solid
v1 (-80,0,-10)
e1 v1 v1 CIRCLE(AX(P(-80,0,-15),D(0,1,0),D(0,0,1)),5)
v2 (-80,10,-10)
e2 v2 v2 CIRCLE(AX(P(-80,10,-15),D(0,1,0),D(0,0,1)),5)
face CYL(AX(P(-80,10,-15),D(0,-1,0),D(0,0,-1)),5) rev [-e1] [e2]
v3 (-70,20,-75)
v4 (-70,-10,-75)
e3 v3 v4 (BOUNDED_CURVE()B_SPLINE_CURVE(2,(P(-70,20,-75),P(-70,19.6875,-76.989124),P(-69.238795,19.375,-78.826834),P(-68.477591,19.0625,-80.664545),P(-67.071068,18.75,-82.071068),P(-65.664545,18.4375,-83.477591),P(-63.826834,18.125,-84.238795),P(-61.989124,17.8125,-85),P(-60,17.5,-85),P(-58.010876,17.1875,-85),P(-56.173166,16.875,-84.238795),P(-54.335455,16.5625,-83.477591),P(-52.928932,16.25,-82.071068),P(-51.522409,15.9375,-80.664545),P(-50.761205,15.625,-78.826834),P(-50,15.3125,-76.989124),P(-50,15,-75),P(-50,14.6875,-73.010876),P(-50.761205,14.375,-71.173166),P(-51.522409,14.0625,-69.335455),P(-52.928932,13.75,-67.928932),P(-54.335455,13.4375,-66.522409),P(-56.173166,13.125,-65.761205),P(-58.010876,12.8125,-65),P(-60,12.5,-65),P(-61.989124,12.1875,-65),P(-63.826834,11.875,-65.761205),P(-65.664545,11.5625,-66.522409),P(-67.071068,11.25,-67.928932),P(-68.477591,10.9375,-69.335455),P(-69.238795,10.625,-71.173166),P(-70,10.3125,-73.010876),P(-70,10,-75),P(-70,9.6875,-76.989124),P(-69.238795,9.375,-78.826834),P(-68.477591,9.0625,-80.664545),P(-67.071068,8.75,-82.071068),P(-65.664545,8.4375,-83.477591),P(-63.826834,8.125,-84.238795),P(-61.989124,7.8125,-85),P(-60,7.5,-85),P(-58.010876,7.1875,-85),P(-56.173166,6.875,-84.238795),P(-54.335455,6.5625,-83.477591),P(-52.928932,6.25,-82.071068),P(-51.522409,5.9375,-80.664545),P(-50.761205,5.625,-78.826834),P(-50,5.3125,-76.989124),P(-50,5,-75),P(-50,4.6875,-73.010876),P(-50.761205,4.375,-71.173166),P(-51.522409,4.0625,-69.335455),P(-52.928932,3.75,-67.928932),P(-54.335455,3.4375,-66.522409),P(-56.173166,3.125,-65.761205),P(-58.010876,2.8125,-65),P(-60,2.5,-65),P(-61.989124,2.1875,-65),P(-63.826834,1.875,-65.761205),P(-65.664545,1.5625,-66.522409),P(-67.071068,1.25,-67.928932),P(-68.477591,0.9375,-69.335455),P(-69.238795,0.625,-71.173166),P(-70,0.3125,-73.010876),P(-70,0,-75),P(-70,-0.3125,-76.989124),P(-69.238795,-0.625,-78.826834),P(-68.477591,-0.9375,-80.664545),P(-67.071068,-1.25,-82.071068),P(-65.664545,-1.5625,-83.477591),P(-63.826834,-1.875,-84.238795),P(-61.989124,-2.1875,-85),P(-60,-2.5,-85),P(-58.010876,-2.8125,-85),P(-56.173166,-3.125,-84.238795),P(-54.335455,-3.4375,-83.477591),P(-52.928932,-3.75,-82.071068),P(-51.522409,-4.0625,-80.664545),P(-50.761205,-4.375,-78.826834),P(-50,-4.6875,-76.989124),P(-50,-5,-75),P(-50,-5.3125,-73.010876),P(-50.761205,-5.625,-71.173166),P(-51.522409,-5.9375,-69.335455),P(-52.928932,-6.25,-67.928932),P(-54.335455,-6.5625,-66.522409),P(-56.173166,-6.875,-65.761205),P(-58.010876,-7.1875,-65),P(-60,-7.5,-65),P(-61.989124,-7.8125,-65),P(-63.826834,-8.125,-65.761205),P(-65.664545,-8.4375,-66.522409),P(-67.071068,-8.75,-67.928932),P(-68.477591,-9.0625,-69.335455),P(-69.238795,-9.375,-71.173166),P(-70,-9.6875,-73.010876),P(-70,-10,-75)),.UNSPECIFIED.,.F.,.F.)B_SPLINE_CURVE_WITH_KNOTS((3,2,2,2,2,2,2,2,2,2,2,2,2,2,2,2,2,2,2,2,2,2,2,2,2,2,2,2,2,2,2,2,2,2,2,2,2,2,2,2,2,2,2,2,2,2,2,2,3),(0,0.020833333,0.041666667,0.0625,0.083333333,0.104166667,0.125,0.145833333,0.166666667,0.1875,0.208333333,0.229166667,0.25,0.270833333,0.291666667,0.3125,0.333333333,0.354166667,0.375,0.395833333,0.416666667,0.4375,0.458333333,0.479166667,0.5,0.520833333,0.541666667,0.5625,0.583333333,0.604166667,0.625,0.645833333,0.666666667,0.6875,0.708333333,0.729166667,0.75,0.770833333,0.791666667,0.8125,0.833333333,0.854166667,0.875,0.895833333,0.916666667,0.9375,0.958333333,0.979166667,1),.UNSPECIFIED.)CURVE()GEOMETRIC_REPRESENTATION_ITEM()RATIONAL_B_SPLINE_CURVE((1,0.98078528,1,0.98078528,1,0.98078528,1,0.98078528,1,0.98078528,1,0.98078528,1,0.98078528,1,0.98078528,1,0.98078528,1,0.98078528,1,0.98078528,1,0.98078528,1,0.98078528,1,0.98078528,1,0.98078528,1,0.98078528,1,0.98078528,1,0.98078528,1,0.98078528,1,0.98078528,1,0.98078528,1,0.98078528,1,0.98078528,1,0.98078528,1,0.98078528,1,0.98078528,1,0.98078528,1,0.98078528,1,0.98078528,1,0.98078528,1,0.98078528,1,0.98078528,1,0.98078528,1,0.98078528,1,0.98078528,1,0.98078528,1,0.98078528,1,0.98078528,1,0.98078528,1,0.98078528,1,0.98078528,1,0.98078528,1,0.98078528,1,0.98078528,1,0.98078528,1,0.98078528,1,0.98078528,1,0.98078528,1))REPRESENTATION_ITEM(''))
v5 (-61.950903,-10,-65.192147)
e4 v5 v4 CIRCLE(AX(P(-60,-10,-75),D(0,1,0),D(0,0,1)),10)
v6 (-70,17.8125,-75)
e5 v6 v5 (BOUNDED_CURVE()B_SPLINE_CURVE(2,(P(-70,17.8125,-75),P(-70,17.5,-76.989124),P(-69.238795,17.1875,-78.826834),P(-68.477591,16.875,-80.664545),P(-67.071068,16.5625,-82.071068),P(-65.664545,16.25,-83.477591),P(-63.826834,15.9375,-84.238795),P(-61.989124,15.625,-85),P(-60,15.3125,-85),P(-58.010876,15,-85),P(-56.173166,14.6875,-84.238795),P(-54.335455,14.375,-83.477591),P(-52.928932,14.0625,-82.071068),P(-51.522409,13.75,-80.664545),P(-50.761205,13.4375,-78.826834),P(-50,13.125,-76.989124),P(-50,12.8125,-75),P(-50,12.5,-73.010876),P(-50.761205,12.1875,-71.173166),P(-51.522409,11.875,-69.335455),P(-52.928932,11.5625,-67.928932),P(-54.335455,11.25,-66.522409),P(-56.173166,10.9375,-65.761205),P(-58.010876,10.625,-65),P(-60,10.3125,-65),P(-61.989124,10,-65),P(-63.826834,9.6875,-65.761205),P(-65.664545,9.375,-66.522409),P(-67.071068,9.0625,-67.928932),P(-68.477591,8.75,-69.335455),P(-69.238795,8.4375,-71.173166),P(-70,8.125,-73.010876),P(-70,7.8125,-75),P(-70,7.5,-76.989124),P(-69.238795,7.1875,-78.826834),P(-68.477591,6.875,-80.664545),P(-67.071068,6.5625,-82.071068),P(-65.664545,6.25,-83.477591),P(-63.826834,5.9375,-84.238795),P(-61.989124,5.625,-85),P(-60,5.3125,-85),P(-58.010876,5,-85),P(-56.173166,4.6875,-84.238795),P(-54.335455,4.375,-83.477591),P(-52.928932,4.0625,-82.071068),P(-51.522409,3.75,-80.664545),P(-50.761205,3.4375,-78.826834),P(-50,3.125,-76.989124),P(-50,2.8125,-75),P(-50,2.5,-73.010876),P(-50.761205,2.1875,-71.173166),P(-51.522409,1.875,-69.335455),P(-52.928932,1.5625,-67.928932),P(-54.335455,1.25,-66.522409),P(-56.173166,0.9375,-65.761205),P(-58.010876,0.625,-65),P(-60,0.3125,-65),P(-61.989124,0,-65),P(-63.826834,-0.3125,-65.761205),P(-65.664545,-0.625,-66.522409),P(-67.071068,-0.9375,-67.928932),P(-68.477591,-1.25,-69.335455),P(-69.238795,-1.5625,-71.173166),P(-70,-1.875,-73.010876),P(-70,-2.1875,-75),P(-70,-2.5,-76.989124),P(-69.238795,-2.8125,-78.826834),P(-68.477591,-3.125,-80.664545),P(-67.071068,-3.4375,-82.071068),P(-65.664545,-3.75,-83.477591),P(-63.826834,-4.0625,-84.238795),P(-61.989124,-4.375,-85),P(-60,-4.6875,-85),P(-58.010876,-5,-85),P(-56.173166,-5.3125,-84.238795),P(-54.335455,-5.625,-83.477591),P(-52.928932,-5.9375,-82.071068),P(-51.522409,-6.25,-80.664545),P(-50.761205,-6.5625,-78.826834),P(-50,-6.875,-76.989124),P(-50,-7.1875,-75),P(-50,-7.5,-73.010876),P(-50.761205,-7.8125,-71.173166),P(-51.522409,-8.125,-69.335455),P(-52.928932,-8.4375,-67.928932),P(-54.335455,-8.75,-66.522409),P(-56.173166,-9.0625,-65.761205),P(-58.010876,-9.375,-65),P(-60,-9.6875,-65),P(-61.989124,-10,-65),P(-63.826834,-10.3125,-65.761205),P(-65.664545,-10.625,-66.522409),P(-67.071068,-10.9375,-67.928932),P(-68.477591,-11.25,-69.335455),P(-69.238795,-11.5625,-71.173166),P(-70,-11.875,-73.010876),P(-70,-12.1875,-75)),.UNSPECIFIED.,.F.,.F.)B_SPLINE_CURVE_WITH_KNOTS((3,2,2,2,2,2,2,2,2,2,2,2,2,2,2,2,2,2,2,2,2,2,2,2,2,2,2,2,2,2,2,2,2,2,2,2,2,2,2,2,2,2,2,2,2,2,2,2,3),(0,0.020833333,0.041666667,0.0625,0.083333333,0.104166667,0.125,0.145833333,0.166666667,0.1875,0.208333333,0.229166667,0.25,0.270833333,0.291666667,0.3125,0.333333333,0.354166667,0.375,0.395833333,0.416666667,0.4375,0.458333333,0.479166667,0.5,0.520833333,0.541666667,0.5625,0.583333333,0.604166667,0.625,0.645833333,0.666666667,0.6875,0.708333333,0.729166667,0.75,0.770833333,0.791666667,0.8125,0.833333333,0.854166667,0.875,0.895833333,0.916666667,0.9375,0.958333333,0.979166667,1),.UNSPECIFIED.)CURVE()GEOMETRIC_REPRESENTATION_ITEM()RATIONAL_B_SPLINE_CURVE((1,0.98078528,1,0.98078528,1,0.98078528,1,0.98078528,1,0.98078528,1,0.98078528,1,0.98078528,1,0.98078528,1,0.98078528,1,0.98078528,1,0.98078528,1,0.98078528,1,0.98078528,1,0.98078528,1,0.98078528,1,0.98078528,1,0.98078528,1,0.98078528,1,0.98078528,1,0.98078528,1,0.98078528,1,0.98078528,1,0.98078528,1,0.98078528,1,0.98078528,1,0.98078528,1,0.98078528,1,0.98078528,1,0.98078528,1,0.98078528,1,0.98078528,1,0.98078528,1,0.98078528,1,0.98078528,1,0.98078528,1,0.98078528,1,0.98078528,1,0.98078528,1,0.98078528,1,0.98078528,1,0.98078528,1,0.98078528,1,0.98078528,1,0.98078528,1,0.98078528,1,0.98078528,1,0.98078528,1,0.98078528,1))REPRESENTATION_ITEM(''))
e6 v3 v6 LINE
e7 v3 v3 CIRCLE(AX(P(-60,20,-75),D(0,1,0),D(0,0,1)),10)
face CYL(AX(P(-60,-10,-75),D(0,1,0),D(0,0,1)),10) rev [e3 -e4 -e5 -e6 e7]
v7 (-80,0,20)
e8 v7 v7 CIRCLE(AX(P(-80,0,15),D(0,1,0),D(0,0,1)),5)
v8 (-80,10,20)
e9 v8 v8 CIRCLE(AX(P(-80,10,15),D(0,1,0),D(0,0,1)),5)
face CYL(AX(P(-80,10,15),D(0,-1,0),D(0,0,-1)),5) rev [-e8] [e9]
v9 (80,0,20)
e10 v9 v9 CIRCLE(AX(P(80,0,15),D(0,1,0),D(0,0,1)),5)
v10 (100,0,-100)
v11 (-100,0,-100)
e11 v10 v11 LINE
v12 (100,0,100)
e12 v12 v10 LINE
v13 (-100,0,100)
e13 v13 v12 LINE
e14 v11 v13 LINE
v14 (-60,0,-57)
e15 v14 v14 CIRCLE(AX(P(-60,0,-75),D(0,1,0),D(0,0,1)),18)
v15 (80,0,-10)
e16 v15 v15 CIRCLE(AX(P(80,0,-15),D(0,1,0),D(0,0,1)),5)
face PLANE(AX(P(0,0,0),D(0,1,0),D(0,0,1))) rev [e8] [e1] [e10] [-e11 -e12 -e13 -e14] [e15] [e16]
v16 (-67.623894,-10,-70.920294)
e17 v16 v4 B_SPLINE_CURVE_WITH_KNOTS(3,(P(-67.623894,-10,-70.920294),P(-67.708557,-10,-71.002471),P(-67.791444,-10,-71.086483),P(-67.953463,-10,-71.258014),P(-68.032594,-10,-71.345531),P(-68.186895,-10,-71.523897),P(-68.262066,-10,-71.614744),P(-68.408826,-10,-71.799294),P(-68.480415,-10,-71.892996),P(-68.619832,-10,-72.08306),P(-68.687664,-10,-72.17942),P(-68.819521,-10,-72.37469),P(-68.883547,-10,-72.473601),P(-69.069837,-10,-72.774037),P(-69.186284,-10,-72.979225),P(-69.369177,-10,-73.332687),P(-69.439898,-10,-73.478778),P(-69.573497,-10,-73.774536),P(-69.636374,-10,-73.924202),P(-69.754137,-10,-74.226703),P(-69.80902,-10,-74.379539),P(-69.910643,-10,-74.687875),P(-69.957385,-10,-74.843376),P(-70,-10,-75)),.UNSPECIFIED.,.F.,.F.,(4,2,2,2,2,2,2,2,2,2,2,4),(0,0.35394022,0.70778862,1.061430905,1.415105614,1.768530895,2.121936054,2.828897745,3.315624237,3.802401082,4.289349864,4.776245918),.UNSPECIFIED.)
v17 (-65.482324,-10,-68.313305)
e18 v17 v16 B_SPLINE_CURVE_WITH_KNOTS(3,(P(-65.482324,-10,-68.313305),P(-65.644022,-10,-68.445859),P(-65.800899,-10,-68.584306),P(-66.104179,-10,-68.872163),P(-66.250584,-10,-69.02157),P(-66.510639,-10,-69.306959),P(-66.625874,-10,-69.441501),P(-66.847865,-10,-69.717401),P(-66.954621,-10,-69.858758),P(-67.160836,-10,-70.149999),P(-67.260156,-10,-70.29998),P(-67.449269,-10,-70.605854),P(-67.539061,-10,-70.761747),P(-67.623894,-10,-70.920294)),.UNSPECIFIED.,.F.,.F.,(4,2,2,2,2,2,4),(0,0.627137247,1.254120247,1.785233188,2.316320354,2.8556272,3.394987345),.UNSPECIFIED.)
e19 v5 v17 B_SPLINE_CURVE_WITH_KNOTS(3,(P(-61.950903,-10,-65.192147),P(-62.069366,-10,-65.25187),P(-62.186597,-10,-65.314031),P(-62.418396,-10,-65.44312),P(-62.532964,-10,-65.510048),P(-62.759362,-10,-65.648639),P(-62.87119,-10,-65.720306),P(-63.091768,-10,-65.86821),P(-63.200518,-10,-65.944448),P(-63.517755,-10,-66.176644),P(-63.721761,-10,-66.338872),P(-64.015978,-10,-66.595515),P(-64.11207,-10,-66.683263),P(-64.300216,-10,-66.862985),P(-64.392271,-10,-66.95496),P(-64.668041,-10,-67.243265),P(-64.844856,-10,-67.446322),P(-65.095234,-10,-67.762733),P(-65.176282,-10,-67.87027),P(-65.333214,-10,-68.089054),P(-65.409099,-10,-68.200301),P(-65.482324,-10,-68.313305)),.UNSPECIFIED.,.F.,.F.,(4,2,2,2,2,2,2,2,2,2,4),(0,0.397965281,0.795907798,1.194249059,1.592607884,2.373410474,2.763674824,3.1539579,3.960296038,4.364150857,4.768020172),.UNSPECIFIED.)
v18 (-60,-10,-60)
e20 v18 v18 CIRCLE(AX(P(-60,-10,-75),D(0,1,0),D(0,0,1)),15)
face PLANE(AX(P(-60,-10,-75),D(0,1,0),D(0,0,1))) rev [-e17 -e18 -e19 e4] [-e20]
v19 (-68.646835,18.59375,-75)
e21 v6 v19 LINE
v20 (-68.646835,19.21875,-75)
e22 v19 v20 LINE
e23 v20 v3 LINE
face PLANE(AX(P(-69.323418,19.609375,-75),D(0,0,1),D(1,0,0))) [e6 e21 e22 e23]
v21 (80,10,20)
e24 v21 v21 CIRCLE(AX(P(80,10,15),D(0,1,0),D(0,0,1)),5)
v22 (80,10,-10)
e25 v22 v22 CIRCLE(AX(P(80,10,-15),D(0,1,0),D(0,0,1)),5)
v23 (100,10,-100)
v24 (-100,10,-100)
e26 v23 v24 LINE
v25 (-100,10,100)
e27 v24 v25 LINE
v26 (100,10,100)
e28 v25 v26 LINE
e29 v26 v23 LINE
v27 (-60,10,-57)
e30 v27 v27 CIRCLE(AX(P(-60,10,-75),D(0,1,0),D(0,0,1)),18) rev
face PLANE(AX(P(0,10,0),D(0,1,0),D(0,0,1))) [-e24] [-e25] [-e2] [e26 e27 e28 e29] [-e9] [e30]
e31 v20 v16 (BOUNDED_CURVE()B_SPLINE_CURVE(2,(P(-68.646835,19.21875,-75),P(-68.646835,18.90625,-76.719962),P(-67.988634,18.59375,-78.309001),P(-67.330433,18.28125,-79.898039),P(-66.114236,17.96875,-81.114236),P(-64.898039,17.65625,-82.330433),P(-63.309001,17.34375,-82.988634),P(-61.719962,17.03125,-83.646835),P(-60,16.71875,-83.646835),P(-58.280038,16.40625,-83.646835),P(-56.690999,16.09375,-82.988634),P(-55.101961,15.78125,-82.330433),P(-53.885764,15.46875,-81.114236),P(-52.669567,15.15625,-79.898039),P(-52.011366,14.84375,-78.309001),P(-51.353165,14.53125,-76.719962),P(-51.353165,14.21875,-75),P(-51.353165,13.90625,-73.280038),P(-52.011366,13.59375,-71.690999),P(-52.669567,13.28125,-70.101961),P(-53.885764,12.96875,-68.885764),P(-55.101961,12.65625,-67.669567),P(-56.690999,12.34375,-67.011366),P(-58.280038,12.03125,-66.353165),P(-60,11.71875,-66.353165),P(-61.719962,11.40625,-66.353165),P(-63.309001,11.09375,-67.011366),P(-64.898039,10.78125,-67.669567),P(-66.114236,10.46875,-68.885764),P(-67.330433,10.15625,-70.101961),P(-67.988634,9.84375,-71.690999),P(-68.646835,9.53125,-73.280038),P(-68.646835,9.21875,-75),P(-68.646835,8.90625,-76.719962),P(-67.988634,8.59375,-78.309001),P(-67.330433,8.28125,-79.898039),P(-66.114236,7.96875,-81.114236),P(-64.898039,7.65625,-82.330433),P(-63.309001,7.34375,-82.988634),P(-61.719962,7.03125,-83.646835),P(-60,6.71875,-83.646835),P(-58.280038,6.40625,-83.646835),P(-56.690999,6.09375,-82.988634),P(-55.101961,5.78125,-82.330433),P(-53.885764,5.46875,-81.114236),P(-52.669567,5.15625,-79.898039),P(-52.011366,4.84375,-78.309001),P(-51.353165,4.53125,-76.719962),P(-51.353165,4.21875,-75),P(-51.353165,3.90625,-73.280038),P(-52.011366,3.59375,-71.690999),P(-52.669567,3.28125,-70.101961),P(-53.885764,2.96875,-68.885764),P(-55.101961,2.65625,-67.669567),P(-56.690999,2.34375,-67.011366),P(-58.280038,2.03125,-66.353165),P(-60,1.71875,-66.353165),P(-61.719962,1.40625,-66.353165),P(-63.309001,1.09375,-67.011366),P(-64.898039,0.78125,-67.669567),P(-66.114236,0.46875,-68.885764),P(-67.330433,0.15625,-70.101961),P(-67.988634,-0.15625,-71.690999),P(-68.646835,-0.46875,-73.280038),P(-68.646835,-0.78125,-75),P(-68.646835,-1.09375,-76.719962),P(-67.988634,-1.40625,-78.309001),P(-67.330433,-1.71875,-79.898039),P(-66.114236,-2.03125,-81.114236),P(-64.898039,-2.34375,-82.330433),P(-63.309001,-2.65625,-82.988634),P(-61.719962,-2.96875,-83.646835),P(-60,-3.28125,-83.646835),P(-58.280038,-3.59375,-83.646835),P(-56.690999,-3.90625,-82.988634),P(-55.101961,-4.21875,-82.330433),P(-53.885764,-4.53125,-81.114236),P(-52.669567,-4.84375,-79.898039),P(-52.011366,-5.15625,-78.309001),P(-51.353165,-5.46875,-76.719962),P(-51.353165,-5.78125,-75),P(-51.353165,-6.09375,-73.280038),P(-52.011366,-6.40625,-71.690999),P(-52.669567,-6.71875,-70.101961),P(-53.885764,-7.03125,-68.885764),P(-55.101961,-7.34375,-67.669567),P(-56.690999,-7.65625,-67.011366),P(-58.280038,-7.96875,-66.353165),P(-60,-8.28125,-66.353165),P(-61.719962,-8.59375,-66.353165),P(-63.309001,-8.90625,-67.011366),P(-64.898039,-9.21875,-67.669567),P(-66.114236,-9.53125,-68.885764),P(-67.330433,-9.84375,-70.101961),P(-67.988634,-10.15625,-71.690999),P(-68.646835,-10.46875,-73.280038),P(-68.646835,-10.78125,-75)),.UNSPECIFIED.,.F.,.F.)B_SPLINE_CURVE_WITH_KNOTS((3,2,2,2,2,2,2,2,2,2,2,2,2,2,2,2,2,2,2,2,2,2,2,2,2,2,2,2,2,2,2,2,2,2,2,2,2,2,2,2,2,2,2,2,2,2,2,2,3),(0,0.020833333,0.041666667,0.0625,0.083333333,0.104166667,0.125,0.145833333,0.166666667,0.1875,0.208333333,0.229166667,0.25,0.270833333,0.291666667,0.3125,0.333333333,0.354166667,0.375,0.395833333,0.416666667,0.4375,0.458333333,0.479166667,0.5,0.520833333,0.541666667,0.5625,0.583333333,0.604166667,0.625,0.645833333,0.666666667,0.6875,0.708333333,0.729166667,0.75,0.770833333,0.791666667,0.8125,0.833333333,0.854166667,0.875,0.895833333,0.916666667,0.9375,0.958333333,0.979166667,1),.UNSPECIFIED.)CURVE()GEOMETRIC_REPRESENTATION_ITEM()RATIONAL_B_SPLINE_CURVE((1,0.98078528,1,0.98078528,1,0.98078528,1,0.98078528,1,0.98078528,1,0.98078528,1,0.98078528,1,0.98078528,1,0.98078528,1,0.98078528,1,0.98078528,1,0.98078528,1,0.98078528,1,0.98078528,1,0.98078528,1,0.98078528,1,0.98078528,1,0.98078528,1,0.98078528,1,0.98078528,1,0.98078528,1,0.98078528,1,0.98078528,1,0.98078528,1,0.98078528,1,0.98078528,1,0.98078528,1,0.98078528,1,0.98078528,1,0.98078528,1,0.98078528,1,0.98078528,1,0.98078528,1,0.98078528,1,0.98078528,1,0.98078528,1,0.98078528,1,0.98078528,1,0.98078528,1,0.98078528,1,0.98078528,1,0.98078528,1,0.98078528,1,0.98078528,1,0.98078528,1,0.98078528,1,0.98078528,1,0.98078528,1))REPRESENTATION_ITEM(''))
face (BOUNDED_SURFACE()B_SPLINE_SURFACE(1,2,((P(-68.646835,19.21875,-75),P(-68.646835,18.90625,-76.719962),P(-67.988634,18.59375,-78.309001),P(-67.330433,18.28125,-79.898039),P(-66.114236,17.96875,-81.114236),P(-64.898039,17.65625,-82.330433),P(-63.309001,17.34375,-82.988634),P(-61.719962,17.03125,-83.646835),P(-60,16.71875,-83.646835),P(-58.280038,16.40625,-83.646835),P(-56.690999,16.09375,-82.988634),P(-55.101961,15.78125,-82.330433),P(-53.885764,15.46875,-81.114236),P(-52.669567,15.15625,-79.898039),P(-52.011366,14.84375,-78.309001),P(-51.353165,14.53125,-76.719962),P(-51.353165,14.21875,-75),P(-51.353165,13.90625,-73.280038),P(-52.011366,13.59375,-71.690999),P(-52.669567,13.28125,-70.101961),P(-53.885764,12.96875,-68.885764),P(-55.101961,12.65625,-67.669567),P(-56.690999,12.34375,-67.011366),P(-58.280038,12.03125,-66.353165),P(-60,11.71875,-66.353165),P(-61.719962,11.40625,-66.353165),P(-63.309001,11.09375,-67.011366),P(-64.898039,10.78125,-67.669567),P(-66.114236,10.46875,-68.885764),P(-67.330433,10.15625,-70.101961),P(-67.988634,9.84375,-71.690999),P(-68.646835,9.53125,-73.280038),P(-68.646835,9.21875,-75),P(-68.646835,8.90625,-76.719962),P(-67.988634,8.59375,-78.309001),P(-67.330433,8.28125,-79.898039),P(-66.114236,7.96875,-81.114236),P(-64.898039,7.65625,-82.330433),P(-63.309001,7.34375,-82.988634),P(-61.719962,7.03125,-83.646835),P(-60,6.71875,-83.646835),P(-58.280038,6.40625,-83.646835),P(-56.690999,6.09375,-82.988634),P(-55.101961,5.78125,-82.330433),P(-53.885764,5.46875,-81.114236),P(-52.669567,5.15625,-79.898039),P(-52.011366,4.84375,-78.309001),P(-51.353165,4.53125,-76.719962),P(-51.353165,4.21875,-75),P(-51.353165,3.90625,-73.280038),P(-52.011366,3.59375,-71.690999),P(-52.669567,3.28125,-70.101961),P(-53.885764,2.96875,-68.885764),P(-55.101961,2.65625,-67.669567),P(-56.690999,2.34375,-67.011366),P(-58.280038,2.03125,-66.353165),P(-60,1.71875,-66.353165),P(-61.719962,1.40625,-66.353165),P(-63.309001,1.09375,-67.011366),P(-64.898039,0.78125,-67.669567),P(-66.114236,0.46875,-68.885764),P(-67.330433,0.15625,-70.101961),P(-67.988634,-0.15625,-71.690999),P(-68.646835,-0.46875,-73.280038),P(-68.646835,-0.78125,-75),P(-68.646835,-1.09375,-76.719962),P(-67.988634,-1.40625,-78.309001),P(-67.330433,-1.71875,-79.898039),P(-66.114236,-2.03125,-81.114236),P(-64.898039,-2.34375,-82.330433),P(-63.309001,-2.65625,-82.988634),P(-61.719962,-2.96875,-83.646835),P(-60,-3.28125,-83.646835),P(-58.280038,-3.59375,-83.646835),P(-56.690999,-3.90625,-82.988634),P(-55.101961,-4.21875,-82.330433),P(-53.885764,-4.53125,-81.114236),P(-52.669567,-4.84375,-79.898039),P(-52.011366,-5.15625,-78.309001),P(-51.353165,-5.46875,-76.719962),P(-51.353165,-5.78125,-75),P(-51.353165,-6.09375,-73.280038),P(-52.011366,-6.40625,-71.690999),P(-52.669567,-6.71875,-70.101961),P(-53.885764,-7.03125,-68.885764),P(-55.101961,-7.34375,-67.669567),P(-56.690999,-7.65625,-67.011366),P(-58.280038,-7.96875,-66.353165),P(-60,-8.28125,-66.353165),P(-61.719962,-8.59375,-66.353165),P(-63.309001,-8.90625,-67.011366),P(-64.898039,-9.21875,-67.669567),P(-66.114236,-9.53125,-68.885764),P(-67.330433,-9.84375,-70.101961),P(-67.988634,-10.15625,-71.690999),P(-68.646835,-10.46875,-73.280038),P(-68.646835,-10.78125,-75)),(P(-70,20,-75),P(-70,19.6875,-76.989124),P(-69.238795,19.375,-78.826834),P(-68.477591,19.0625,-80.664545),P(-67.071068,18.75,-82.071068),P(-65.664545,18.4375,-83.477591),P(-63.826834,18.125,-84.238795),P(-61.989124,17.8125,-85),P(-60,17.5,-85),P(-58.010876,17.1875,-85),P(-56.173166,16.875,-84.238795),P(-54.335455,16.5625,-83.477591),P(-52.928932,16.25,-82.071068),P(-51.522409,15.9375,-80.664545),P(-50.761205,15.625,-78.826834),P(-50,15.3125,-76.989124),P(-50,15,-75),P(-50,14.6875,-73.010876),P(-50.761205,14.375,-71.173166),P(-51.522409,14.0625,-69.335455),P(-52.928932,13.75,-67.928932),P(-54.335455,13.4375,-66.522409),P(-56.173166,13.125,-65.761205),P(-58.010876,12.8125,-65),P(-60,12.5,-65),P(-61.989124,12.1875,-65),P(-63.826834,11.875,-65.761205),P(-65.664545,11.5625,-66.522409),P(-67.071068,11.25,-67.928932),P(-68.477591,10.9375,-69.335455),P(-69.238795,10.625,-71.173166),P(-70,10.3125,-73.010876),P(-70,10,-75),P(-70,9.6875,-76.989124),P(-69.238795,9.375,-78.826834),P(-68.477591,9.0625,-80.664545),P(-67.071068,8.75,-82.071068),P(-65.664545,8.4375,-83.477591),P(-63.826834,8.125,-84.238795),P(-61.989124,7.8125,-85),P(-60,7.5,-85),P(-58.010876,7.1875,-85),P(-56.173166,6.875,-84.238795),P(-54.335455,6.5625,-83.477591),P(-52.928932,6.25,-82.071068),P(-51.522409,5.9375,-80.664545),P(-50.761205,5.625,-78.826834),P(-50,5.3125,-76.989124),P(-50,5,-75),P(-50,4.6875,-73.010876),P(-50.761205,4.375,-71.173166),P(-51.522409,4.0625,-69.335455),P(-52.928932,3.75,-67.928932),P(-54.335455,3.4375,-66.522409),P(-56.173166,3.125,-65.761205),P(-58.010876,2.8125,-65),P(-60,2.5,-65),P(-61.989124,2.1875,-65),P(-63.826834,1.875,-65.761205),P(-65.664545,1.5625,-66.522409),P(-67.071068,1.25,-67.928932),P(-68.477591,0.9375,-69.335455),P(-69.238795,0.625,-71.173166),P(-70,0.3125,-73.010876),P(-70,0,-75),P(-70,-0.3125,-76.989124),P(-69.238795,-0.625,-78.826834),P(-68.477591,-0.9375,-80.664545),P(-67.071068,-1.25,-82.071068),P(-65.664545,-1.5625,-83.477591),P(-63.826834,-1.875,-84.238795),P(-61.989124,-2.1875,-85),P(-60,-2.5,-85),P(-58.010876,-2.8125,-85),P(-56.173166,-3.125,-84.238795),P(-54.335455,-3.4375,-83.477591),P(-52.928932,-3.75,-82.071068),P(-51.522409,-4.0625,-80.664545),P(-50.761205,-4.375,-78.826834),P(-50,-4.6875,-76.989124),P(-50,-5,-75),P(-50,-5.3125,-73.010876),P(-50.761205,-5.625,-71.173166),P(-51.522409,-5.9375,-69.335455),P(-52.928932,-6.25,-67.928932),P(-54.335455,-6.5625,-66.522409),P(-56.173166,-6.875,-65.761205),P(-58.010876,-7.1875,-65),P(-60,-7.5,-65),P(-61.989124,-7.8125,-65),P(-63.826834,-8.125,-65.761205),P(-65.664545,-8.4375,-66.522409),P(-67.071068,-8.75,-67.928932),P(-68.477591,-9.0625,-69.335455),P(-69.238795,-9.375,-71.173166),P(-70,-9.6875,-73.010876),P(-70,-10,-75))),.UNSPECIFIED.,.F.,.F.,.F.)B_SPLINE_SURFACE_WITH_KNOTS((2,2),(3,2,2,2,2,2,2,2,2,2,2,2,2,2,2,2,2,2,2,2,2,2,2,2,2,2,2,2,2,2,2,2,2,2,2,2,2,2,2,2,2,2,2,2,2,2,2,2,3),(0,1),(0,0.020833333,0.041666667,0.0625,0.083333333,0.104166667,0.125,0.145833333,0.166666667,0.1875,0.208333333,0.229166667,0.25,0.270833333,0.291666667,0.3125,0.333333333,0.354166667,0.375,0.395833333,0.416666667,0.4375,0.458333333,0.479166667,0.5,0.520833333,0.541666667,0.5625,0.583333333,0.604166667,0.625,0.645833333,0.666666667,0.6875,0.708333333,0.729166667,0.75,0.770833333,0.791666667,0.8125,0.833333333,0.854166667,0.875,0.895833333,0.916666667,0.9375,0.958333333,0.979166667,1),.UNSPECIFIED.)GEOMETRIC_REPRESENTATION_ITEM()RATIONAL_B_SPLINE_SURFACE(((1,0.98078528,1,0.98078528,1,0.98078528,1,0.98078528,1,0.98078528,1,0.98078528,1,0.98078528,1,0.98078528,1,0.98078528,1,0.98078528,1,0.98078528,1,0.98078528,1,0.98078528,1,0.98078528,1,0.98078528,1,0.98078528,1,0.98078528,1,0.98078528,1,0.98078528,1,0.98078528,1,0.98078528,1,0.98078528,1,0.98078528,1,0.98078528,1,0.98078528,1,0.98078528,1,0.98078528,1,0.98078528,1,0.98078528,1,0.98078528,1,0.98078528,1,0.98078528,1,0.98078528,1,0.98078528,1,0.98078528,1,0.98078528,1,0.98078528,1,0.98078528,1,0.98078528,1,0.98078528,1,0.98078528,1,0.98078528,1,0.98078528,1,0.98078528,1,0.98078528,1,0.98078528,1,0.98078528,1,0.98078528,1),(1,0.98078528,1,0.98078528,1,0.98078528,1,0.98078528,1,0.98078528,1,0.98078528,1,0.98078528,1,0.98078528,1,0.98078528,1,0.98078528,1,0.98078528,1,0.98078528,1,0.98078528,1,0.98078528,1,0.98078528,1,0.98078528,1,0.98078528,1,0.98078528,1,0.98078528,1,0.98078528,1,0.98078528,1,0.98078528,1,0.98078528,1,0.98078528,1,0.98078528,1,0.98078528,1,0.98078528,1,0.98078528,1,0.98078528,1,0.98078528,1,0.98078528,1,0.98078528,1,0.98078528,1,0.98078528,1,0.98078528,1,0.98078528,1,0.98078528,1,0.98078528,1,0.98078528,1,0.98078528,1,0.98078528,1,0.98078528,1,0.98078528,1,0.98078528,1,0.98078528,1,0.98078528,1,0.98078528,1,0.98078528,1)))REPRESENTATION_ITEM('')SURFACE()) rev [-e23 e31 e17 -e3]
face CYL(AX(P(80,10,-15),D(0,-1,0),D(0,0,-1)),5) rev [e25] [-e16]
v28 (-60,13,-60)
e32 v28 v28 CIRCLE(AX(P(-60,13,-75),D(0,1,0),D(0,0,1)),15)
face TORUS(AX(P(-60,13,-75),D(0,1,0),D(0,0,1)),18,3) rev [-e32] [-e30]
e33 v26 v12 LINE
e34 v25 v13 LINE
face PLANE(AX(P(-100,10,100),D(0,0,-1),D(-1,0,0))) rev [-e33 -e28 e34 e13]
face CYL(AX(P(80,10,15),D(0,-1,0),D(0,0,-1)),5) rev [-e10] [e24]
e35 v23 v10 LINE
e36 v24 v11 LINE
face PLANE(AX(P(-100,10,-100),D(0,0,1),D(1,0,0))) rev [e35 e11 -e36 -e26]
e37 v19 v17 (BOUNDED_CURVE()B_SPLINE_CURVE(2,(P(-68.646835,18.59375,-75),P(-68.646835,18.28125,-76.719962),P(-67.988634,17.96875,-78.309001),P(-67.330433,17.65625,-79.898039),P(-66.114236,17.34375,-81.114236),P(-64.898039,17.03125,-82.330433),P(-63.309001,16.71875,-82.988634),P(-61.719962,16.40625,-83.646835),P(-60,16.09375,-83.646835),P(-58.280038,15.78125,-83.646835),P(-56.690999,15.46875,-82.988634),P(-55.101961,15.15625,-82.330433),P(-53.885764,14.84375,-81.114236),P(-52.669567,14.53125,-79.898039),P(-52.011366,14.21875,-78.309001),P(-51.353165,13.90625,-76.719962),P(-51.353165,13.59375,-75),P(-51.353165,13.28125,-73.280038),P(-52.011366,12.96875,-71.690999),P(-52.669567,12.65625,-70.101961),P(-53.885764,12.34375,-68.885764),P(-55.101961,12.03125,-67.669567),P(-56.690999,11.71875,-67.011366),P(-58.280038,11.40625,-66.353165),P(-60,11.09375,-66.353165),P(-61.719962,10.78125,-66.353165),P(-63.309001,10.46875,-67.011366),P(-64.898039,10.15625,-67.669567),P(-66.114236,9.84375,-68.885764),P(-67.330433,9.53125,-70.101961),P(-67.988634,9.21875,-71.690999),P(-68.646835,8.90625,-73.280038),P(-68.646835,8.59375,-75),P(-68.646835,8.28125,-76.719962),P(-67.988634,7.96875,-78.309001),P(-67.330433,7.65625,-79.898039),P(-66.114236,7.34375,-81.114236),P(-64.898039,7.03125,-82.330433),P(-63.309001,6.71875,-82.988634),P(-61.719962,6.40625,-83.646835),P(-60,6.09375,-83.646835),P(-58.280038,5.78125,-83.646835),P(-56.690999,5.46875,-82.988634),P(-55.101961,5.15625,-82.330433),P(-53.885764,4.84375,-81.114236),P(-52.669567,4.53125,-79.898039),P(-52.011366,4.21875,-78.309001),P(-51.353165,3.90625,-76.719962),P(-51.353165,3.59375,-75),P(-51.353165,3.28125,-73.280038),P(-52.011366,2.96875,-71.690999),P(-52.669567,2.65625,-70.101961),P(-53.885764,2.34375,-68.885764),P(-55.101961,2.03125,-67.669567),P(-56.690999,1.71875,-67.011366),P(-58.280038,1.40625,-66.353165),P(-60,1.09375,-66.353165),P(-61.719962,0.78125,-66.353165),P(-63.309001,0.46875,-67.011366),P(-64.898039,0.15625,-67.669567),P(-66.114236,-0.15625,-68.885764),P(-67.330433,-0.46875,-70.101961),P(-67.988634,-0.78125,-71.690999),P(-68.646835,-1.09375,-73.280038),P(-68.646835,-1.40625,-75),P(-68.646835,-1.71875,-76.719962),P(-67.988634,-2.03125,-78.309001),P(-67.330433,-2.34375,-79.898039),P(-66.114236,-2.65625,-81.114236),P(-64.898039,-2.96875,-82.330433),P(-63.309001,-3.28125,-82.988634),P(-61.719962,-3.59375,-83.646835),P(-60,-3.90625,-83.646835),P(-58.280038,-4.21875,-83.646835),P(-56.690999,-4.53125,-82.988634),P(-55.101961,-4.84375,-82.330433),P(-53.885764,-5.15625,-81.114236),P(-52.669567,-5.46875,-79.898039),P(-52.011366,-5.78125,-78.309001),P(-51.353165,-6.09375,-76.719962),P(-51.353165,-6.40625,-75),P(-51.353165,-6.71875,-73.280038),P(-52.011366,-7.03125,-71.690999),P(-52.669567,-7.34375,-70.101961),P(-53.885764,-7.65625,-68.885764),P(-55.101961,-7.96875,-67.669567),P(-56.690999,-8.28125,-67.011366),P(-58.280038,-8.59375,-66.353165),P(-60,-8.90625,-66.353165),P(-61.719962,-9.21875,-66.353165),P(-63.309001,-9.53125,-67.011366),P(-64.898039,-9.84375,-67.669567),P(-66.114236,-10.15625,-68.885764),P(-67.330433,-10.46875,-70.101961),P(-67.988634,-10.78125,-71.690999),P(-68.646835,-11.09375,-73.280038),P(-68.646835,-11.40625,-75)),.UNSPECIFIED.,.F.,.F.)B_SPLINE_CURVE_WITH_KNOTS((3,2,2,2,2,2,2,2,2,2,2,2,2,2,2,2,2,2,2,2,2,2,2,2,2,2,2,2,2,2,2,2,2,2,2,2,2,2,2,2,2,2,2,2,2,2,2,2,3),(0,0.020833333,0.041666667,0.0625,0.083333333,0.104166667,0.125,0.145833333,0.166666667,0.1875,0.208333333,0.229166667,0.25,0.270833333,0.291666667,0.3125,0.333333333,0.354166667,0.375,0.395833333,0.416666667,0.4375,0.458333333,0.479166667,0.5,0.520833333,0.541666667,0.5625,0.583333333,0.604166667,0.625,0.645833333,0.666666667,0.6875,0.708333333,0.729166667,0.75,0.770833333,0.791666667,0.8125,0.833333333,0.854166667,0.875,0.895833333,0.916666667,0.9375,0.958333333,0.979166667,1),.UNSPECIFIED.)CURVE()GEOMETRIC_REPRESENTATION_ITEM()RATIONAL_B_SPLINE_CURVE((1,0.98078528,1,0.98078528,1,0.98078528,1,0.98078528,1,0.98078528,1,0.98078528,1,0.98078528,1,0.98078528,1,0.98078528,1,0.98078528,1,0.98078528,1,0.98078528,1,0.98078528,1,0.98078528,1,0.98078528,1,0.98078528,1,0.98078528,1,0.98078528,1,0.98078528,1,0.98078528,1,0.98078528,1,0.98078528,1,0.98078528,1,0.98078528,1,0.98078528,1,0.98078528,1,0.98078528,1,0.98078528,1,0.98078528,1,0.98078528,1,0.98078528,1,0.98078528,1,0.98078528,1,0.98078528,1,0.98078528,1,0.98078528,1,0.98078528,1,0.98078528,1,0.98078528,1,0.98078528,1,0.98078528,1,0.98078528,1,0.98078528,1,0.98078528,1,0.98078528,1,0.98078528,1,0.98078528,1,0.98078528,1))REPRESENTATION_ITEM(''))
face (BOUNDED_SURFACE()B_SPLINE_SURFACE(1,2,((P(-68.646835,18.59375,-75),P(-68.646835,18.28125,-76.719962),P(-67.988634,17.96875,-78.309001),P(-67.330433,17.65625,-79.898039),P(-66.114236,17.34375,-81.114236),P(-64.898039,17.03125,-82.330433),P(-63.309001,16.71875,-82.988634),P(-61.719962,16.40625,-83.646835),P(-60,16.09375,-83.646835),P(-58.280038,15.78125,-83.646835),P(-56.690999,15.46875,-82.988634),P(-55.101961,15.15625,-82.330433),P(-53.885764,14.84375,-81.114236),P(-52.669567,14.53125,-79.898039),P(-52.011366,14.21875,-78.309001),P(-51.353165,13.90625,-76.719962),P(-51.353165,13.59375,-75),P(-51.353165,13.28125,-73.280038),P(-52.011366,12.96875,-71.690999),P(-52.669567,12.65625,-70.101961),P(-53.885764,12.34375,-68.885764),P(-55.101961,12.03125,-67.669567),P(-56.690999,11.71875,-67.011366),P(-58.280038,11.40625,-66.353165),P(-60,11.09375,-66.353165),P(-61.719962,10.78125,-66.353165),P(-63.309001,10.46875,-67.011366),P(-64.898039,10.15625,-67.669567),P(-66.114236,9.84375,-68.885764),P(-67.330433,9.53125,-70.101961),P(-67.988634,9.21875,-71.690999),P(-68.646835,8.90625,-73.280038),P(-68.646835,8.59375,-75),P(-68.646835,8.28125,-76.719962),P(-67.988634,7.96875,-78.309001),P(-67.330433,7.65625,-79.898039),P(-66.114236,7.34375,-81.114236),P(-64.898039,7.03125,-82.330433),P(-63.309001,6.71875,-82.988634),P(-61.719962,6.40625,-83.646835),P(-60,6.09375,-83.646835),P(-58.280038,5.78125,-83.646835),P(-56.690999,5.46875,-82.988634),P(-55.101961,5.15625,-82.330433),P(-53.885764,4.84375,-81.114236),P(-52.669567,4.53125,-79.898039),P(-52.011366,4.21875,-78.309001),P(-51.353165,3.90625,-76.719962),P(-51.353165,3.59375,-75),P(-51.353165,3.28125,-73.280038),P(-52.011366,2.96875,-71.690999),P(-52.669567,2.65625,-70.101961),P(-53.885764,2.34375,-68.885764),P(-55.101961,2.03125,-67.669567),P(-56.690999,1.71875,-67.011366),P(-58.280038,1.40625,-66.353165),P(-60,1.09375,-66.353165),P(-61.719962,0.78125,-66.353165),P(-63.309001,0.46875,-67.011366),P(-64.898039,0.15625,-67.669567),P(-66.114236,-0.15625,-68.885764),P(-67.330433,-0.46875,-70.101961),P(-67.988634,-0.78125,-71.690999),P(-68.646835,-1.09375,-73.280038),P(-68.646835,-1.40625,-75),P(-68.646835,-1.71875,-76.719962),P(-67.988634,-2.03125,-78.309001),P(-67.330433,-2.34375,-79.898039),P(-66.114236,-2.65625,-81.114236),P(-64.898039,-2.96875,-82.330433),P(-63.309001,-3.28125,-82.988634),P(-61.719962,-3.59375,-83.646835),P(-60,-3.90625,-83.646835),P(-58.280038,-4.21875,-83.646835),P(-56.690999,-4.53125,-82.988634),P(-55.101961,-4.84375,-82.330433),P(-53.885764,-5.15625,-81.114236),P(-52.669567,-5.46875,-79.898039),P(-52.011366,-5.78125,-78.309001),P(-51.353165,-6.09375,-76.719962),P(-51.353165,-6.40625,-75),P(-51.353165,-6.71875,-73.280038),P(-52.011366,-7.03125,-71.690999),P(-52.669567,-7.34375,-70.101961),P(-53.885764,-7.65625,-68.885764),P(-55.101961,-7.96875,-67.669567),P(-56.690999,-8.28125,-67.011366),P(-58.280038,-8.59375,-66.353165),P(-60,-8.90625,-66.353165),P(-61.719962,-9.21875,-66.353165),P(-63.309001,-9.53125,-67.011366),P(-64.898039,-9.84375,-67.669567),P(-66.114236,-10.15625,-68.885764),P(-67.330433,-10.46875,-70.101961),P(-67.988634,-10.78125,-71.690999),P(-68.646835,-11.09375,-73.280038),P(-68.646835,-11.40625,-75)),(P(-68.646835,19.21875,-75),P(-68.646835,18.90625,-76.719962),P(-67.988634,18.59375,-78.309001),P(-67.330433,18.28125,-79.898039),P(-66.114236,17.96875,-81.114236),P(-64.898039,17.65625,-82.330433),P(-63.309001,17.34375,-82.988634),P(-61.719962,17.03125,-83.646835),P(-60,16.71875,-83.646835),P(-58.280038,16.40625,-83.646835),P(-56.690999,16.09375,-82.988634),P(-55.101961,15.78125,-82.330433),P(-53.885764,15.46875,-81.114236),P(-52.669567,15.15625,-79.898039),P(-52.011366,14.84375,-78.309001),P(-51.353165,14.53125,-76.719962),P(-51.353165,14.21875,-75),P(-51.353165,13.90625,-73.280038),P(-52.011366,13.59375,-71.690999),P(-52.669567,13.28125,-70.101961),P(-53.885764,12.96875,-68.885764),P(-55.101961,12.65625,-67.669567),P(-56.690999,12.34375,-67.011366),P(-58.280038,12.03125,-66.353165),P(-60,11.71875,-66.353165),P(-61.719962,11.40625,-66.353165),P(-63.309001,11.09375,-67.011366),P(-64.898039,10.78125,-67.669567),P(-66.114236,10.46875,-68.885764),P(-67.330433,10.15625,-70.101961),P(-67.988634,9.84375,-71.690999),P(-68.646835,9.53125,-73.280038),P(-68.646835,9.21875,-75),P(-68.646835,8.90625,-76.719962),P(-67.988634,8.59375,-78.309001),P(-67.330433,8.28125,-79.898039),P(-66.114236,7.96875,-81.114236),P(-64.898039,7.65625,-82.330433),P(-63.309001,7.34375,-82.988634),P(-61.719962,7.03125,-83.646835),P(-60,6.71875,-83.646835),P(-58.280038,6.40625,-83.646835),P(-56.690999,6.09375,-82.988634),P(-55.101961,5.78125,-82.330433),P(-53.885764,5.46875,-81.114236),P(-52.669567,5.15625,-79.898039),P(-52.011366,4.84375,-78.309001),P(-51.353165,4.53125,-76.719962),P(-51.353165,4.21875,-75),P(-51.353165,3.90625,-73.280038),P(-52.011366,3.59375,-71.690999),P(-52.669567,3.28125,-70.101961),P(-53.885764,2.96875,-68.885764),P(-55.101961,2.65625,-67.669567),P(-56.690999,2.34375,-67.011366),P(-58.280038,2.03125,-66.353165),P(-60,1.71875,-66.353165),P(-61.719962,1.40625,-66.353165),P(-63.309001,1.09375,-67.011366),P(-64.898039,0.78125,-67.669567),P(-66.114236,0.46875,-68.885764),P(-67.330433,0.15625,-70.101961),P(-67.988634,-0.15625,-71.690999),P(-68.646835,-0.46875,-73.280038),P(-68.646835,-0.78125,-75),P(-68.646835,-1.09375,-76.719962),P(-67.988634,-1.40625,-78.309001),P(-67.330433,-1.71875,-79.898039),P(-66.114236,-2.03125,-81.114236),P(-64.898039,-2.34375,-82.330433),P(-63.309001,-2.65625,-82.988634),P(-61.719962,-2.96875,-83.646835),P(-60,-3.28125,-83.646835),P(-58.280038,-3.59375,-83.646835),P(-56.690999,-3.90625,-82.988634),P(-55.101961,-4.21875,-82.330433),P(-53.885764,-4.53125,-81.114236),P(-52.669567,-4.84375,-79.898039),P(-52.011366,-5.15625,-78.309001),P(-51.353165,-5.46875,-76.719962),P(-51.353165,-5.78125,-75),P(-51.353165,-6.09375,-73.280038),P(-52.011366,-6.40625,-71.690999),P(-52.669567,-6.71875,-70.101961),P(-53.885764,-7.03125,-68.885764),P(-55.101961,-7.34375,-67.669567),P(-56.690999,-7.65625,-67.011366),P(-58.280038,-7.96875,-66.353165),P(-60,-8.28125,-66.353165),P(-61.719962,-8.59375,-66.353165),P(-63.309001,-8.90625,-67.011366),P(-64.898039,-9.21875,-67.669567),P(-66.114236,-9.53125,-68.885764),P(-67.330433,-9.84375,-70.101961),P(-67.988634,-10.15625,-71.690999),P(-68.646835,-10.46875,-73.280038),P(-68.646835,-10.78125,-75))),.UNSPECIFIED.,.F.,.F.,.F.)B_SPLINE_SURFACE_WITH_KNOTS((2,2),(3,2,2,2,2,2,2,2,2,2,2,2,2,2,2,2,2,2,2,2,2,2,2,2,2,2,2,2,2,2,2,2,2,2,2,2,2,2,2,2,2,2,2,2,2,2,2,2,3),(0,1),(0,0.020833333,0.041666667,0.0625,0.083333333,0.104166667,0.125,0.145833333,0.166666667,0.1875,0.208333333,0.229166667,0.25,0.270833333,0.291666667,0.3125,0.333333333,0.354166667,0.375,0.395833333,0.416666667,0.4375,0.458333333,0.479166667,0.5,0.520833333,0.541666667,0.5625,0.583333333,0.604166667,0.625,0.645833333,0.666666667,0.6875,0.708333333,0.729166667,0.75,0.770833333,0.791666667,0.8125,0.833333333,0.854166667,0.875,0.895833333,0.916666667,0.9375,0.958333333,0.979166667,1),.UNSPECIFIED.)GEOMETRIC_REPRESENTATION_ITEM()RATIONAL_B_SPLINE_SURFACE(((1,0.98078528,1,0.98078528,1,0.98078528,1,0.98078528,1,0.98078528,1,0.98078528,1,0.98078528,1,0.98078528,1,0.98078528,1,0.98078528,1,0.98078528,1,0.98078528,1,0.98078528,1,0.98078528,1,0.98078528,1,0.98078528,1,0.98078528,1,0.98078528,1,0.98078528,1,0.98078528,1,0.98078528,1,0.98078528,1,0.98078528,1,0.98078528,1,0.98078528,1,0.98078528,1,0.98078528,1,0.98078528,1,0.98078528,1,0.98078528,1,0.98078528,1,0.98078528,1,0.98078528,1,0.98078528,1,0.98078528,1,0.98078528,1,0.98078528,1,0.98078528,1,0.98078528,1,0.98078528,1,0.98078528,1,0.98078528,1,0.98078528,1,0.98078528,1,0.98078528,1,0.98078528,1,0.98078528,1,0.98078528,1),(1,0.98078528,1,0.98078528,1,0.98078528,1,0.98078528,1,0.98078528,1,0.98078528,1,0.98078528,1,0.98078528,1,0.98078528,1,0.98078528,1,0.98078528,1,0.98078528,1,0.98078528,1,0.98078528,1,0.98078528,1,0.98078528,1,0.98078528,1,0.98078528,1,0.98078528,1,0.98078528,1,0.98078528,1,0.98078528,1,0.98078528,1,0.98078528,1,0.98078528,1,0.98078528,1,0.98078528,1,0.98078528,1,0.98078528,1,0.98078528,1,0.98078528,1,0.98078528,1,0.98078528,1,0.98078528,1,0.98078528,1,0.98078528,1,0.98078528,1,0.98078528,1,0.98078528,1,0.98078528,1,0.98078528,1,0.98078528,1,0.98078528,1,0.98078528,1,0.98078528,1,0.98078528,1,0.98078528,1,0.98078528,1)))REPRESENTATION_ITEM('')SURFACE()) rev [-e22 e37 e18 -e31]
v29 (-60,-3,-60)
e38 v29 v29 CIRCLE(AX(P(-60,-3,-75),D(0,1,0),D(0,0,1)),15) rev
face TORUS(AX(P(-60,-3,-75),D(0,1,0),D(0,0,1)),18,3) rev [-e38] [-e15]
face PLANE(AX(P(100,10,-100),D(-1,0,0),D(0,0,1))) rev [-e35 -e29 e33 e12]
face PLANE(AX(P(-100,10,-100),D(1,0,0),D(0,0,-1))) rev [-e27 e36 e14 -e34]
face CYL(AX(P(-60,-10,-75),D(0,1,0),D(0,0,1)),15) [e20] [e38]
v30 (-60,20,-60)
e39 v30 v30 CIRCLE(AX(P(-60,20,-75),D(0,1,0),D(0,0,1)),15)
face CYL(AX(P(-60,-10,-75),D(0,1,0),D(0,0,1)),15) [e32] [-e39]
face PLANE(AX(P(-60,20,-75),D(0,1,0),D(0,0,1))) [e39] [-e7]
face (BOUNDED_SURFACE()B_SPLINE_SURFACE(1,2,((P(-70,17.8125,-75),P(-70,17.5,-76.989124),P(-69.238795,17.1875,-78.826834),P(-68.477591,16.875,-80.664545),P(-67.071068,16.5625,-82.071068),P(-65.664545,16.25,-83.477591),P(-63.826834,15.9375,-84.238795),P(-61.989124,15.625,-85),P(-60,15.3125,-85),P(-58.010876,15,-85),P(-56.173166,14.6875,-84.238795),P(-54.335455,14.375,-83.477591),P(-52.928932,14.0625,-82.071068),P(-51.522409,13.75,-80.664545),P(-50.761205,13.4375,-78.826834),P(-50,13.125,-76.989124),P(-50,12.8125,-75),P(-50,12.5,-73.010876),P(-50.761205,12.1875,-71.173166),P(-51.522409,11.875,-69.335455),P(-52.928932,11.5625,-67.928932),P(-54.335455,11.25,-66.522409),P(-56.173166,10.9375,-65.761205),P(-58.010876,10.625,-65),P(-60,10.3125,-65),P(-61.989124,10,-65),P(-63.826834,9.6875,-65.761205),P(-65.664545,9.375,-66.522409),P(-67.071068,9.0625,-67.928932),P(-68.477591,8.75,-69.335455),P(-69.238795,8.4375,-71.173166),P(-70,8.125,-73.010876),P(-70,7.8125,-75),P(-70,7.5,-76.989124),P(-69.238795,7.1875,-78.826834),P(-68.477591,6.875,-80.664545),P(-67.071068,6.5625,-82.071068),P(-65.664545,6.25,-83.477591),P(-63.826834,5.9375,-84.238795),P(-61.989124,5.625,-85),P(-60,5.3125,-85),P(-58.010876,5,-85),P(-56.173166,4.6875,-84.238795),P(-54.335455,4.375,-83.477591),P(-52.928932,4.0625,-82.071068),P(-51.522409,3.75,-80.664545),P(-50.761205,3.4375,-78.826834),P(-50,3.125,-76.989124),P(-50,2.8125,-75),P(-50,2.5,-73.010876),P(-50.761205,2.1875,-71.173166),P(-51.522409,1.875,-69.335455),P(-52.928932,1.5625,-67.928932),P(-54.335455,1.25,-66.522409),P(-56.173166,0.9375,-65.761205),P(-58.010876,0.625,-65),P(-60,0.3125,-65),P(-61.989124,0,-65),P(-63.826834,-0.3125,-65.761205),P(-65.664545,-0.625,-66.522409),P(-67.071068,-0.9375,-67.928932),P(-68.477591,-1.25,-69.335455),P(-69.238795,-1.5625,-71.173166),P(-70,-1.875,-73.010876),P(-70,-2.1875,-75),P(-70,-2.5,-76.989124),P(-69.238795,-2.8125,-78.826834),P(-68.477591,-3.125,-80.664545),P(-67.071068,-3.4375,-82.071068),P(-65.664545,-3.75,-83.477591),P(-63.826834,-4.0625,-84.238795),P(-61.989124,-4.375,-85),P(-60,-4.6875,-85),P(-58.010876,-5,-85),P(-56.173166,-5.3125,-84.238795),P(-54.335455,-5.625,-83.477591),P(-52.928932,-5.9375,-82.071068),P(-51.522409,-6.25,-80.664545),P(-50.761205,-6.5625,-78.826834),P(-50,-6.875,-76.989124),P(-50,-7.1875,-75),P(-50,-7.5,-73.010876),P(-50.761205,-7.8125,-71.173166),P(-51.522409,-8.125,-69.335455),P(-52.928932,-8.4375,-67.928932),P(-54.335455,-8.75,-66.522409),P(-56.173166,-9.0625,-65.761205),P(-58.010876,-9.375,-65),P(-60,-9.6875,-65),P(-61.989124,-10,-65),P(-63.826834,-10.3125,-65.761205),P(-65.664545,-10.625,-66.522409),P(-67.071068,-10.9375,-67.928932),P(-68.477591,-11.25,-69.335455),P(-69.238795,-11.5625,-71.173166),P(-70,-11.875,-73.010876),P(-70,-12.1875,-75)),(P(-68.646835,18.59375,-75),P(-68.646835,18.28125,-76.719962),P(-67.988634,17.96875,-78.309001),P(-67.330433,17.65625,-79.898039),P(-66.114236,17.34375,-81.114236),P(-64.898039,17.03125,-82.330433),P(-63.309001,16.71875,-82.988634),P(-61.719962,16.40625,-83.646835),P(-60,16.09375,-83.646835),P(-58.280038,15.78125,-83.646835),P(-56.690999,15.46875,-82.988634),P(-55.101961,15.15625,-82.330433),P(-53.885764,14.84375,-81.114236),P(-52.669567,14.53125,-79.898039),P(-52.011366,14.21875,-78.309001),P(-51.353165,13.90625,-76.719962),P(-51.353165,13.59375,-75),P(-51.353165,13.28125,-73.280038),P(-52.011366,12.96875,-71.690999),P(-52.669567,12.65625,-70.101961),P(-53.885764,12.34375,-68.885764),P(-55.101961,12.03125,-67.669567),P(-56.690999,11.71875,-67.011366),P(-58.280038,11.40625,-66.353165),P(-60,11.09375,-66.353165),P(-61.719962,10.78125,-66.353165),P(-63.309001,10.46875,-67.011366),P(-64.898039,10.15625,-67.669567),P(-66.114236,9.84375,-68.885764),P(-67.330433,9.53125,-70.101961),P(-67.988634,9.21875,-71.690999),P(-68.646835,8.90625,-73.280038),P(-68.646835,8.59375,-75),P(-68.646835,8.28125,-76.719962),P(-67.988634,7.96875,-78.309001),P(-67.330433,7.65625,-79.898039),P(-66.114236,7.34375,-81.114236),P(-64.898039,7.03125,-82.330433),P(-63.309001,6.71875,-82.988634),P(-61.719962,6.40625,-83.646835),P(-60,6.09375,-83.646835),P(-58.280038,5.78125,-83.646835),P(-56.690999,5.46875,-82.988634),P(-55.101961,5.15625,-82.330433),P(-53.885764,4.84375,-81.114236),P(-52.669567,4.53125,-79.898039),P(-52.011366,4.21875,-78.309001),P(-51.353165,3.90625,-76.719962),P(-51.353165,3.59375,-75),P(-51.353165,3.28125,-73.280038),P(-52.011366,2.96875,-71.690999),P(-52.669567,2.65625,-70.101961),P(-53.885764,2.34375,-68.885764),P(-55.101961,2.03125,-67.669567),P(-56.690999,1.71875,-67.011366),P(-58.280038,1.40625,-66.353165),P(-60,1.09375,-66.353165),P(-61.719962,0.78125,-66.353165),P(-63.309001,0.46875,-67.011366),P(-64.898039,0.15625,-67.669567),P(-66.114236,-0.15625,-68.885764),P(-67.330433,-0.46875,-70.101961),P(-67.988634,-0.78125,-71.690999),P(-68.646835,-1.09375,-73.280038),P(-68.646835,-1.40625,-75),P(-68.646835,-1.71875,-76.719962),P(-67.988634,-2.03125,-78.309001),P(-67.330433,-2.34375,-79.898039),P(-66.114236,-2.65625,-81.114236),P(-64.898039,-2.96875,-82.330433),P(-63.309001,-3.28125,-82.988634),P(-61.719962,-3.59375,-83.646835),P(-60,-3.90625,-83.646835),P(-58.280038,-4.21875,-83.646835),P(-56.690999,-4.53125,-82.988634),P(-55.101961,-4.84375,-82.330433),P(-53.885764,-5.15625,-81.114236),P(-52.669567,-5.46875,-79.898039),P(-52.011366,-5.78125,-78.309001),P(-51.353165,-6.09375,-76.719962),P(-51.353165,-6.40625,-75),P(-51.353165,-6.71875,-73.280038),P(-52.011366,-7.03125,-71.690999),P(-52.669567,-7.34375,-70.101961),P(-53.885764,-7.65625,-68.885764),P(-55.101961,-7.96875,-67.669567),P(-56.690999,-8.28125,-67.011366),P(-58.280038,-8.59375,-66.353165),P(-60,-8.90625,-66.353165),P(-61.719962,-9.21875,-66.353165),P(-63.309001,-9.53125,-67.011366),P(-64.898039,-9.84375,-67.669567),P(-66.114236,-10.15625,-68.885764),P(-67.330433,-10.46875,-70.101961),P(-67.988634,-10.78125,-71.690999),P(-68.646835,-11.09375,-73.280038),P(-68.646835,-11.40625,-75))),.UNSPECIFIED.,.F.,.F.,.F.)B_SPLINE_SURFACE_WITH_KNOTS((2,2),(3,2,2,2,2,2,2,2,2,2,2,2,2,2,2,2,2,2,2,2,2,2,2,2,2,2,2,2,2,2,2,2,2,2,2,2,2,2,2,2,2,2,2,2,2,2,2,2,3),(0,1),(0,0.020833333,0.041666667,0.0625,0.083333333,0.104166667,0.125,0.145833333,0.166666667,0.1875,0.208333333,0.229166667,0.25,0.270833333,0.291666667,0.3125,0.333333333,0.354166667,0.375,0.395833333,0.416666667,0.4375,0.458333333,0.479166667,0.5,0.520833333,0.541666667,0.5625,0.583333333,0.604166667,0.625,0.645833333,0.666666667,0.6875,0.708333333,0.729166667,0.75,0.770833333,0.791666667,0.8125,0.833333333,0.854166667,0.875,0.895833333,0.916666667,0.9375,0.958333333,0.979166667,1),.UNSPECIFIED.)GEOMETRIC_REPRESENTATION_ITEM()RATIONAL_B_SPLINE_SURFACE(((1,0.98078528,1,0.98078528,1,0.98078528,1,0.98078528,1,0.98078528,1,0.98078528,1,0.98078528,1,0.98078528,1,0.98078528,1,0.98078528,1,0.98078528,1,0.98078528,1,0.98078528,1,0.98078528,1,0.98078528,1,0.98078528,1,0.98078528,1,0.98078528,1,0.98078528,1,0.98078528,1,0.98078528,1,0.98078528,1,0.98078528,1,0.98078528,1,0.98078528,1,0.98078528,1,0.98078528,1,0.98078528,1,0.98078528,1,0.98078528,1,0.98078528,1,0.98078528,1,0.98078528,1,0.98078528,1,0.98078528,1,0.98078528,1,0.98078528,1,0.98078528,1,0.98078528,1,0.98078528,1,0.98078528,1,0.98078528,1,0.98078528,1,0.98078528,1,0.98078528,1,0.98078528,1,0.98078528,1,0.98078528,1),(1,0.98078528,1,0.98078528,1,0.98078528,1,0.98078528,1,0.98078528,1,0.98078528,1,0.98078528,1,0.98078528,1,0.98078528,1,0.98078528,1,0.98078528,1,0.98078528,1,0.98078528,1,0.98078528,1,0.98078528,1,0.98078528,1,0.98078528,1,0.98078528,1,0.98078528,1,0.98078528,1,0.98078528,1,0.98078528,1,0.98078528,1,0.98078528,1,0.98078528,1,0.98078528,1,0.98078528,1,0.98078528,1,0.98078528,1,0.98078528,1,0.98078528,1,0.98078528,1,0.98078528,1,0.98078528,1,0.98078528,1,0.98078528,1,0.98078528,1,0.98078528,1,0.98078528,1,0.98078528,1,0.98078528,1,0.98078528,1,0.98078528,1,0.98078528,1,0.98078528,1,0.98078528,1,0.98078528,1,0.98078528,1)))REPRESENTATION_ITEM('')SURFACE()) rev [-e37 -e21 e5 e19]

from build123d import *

# Parameters (mm, degrees)
SKETCH1_W                = 200
SKETCH1_H                = 200
BOSS_EXTRUDE1_DEPTH      = 10
CUT_EXTRUDE1_DEPTH       = 142.774468788
CUT_EXTRUDE1_DEPTH_BACK  = 142.774468788
SKETCH2_R                = 5
BOSS_EXTRUDE2_DEPTH      = 20
BOSS_EXTRUDE2_DEPTH_BACK = 10
SKETCH3_R                = 15
SKETCH3_R_2              = 10
FILLET1_R                = 3
CUT_EXTRUDE2_DEPTH       = 143.828568571
CUT_EXTRUDE2_DEPTH_BACK  = 143.828568571
SKETCH8_R                = 10
THREAD1_PITCH            = 10
CUT_EXTRUDE3_DEPTH       = 143.828592839
CUT_EXTRUDE3_DEPTH_BACK  = 143.828592839
SKETCH11_W               = 30
SKETCH11_H               = 5.972577122


with BuildPart() as part:
    # Sketch1 → Boss-Extrude1 (new body)
    with BuildSketch(Plane(origin=(0, 0, 0), x_dir=(1, 0, 0), z_dir=(0, 1, 0))):
        Rectangle(SKETCH1_W, SKETCH1_H)
    extrude(amount=BOSS_EXTRUDE1_DEPTH)

    # Sketch2 → Cut-Extrude1 (cut, two sides: drawn at the far end of the back side and taken through both)
    with BuildSketch(Plane(origin=(0, 0, 0), x_dir=(1, 0, 0), z_dir=(0, 1, 0)).offset(-CUT_EXTRUDE1_DEPTH_BACK)):
        with Locations(Location((-80, 15, 0), (0, 0, 270))):
            Circle(SKETCH2_R)
        with Locations(Location((-80, -15, 0), (0, 0, 270))):
            Circle(SKETCH2_R)
        with Locations(Location((80, 15, 0), (0, 0, 270))):
            Circle(SKETCH2_R)
        with Locations(Location((80, -15, 0), (0, 0, 270))):
            Circle(SKETCH2_R)
    extrude(amount=CUT_EXTRUDE1_DEPTH + CUT_EXTRUDE1_DEPTH_BACK, mode=Mode.SUBTRACT)

    # Sketch3 → Boss-Extrude2 (add, two sides: drawn at the far end of the back side and taken through both)
    with BuildSketch(Plane(origin=(0, 0, 0), x_dir=(1, 0, 0), z_dir=(0, 1, 0)).offset(-BOSS_EXTRUDE2_DEPTH_BACK)):
        with Locations(Location((-60, 75, 0), (0, 0, 270))):
            Circle(SKETCH3_R)
        with Locations(Location((-60, 75, 0), (0, 0, 270))):
            Circle(SKETCH3_R_2, mode=Mode.SUBTRACT)
    extrude(amount=BOSS_EXTRUDE2_DEPTH + BOSS_EXTRUDE2_DEPTH_BACK)

    # Fillet1
    fillet1_edges = [part.edges().sort_by_distance(p)[0] for p in [
        (-60, 10, -90),
        (-60, 0, -90),
    ]]
    fillet(fillet1_edges, radius=FILLET1_R)

    # Sketch8 → Cut-Extrude2 (cut, two sides: drawn at the far end of the back side and taken through both)
    with BuildSketch(Plane(origin=(0, 0, 0), x_dir=(1, 0, 0), z_dir=(0, 1, 0)).offset(-CUT_EXTRUDE2_DEPTH_BACK)):
        with Locations(Location((-60, 75, 0), (0, 0, 270))):
            Circle(SKETCH8_R)
    extrude(amount=CUT_EXTRUDE2_DEPTH + CUT_EXTRUDE2_DEPTH_BACK, mode=Mode.SUBTRACT)

    # Thread1: the profile of Thread Profile1 profile screwed along a right-hand helix of 3 turns, 16 arcs to a turn; built about Z, then put on its axis
    thread1_z = Axis((0, 0, 0), (0, 0, 1))
    thread1_corners = [(10.0003, 0, -0.000173205), (10.0003, 0, 2.187673198), (8.646835313, 0, 1.406249997), (8.646835313, 0, 0.781249997)]
    with BuildLine(mode=Mode.PRIVATE) as thread1_profile:
        Line(thread1_corners[0], thread1_corners[1])
        Line(thread1_corners[1], thread1_corners[2])
        Line(thread1_corners[2], thread1_corners[3])
        Line(thread1_corners[3], thread1_corners[0])
    thread1_cap = Face(thread1_profile.wire())
    thread1_turn_angles = [0, 11.25, 22.5, 33.75, 45, 56.25, 67.5, 78.75, 90, 101.25, 112.5, 123.75, 135, 146.25, 157.5, 168.75, 180, 191.25, 202.5, 213.75, 225, 236.25, 247.5, 258.75, 270, 281.25, 292.5, 303.75, 315, 326.25, 337.5, 348.75, 360]
    thread1_turn_weights = [1, 0.9807852804032304, 1, 0.9807852804032304, 1, 0.9807852804032304, 1, 0.9807852804032304, 1, 0.9807852804032304, 1, 0.9807852804032304, 1, 0.9807852804032304, 1, 0.9807852804032304, 1, 0.9807852804032304, 1, 0.9807852804032304, 1, 0.9807852804032304, 1, 0.9807852804032304, 1, 0.9807852804032304, 1, 0.9807852804032304, 1, 0.9807852804032304, 1, 0.9807852804032304, 1]
    thread1_turn_rails = [Edge.make_bspline([Vector(p[0], p[1], 0).rotate(thread1_z, thread1_turn_angles[k]) / thread1_turn_weights[k] + Vector(0, 0, p[2] + THREAD1_PITCH * thread1_turn_angles[k] / 360) for k in range(33)], [0, 0, 0, 1, 1, 2, 2, 3, 3, 4, 4, 5, 5, 6, 6, 7, 7, 8, 8, 9, 9, 10, 10, 11, 11, 12, 12, 13, 13, 14, 14, 15, 15, 16, 16, 16], 2, thread1_turn_weights) for p in thread1_corners]
    thread1_turn_sides = [Face.make_surface_from_curves(thread1_turn_rails[p[0]], thread1_turn_rails[p[1]]) for p in [(0, 1), (1, 2), (2, 3), (3, 0)]]
    thread1 = Plane(origin=(-60, 20, -75), x_dir=(-1, 0, 0), z_dir=(0, -1, 0)) * Solid(Shell([*[p.moved(Location((0, 0, THREAD1_PITCH * i))) for i in range(3) for p in thread1_turn_sides], thread1_cap, thread1_cap.rotate(thread1_z, 1080).moved(Location((0, 0, THREAD1_PITCH * 1080 / 360)))]))
    add(thread1)

    # Sketch11 → Cut-Extrude3 (cut, two sides: drawn at the far end of the back side and taken through both)
    with BuildSketch(Plane.XY.offset(-CUT_EXTRUDE3_DEPTH_BACK)):
        with Locations((-60, -12.986288561)):
            Rectangle(SKETCH11_W, SKETCH11_H)
    extrude(amount=CUT_EXTRUDE3_DEPTH + CUT_EXTRUDE3_DEPTH_BACK, mode=Mode.SUBTRACT)


solid = part.part
